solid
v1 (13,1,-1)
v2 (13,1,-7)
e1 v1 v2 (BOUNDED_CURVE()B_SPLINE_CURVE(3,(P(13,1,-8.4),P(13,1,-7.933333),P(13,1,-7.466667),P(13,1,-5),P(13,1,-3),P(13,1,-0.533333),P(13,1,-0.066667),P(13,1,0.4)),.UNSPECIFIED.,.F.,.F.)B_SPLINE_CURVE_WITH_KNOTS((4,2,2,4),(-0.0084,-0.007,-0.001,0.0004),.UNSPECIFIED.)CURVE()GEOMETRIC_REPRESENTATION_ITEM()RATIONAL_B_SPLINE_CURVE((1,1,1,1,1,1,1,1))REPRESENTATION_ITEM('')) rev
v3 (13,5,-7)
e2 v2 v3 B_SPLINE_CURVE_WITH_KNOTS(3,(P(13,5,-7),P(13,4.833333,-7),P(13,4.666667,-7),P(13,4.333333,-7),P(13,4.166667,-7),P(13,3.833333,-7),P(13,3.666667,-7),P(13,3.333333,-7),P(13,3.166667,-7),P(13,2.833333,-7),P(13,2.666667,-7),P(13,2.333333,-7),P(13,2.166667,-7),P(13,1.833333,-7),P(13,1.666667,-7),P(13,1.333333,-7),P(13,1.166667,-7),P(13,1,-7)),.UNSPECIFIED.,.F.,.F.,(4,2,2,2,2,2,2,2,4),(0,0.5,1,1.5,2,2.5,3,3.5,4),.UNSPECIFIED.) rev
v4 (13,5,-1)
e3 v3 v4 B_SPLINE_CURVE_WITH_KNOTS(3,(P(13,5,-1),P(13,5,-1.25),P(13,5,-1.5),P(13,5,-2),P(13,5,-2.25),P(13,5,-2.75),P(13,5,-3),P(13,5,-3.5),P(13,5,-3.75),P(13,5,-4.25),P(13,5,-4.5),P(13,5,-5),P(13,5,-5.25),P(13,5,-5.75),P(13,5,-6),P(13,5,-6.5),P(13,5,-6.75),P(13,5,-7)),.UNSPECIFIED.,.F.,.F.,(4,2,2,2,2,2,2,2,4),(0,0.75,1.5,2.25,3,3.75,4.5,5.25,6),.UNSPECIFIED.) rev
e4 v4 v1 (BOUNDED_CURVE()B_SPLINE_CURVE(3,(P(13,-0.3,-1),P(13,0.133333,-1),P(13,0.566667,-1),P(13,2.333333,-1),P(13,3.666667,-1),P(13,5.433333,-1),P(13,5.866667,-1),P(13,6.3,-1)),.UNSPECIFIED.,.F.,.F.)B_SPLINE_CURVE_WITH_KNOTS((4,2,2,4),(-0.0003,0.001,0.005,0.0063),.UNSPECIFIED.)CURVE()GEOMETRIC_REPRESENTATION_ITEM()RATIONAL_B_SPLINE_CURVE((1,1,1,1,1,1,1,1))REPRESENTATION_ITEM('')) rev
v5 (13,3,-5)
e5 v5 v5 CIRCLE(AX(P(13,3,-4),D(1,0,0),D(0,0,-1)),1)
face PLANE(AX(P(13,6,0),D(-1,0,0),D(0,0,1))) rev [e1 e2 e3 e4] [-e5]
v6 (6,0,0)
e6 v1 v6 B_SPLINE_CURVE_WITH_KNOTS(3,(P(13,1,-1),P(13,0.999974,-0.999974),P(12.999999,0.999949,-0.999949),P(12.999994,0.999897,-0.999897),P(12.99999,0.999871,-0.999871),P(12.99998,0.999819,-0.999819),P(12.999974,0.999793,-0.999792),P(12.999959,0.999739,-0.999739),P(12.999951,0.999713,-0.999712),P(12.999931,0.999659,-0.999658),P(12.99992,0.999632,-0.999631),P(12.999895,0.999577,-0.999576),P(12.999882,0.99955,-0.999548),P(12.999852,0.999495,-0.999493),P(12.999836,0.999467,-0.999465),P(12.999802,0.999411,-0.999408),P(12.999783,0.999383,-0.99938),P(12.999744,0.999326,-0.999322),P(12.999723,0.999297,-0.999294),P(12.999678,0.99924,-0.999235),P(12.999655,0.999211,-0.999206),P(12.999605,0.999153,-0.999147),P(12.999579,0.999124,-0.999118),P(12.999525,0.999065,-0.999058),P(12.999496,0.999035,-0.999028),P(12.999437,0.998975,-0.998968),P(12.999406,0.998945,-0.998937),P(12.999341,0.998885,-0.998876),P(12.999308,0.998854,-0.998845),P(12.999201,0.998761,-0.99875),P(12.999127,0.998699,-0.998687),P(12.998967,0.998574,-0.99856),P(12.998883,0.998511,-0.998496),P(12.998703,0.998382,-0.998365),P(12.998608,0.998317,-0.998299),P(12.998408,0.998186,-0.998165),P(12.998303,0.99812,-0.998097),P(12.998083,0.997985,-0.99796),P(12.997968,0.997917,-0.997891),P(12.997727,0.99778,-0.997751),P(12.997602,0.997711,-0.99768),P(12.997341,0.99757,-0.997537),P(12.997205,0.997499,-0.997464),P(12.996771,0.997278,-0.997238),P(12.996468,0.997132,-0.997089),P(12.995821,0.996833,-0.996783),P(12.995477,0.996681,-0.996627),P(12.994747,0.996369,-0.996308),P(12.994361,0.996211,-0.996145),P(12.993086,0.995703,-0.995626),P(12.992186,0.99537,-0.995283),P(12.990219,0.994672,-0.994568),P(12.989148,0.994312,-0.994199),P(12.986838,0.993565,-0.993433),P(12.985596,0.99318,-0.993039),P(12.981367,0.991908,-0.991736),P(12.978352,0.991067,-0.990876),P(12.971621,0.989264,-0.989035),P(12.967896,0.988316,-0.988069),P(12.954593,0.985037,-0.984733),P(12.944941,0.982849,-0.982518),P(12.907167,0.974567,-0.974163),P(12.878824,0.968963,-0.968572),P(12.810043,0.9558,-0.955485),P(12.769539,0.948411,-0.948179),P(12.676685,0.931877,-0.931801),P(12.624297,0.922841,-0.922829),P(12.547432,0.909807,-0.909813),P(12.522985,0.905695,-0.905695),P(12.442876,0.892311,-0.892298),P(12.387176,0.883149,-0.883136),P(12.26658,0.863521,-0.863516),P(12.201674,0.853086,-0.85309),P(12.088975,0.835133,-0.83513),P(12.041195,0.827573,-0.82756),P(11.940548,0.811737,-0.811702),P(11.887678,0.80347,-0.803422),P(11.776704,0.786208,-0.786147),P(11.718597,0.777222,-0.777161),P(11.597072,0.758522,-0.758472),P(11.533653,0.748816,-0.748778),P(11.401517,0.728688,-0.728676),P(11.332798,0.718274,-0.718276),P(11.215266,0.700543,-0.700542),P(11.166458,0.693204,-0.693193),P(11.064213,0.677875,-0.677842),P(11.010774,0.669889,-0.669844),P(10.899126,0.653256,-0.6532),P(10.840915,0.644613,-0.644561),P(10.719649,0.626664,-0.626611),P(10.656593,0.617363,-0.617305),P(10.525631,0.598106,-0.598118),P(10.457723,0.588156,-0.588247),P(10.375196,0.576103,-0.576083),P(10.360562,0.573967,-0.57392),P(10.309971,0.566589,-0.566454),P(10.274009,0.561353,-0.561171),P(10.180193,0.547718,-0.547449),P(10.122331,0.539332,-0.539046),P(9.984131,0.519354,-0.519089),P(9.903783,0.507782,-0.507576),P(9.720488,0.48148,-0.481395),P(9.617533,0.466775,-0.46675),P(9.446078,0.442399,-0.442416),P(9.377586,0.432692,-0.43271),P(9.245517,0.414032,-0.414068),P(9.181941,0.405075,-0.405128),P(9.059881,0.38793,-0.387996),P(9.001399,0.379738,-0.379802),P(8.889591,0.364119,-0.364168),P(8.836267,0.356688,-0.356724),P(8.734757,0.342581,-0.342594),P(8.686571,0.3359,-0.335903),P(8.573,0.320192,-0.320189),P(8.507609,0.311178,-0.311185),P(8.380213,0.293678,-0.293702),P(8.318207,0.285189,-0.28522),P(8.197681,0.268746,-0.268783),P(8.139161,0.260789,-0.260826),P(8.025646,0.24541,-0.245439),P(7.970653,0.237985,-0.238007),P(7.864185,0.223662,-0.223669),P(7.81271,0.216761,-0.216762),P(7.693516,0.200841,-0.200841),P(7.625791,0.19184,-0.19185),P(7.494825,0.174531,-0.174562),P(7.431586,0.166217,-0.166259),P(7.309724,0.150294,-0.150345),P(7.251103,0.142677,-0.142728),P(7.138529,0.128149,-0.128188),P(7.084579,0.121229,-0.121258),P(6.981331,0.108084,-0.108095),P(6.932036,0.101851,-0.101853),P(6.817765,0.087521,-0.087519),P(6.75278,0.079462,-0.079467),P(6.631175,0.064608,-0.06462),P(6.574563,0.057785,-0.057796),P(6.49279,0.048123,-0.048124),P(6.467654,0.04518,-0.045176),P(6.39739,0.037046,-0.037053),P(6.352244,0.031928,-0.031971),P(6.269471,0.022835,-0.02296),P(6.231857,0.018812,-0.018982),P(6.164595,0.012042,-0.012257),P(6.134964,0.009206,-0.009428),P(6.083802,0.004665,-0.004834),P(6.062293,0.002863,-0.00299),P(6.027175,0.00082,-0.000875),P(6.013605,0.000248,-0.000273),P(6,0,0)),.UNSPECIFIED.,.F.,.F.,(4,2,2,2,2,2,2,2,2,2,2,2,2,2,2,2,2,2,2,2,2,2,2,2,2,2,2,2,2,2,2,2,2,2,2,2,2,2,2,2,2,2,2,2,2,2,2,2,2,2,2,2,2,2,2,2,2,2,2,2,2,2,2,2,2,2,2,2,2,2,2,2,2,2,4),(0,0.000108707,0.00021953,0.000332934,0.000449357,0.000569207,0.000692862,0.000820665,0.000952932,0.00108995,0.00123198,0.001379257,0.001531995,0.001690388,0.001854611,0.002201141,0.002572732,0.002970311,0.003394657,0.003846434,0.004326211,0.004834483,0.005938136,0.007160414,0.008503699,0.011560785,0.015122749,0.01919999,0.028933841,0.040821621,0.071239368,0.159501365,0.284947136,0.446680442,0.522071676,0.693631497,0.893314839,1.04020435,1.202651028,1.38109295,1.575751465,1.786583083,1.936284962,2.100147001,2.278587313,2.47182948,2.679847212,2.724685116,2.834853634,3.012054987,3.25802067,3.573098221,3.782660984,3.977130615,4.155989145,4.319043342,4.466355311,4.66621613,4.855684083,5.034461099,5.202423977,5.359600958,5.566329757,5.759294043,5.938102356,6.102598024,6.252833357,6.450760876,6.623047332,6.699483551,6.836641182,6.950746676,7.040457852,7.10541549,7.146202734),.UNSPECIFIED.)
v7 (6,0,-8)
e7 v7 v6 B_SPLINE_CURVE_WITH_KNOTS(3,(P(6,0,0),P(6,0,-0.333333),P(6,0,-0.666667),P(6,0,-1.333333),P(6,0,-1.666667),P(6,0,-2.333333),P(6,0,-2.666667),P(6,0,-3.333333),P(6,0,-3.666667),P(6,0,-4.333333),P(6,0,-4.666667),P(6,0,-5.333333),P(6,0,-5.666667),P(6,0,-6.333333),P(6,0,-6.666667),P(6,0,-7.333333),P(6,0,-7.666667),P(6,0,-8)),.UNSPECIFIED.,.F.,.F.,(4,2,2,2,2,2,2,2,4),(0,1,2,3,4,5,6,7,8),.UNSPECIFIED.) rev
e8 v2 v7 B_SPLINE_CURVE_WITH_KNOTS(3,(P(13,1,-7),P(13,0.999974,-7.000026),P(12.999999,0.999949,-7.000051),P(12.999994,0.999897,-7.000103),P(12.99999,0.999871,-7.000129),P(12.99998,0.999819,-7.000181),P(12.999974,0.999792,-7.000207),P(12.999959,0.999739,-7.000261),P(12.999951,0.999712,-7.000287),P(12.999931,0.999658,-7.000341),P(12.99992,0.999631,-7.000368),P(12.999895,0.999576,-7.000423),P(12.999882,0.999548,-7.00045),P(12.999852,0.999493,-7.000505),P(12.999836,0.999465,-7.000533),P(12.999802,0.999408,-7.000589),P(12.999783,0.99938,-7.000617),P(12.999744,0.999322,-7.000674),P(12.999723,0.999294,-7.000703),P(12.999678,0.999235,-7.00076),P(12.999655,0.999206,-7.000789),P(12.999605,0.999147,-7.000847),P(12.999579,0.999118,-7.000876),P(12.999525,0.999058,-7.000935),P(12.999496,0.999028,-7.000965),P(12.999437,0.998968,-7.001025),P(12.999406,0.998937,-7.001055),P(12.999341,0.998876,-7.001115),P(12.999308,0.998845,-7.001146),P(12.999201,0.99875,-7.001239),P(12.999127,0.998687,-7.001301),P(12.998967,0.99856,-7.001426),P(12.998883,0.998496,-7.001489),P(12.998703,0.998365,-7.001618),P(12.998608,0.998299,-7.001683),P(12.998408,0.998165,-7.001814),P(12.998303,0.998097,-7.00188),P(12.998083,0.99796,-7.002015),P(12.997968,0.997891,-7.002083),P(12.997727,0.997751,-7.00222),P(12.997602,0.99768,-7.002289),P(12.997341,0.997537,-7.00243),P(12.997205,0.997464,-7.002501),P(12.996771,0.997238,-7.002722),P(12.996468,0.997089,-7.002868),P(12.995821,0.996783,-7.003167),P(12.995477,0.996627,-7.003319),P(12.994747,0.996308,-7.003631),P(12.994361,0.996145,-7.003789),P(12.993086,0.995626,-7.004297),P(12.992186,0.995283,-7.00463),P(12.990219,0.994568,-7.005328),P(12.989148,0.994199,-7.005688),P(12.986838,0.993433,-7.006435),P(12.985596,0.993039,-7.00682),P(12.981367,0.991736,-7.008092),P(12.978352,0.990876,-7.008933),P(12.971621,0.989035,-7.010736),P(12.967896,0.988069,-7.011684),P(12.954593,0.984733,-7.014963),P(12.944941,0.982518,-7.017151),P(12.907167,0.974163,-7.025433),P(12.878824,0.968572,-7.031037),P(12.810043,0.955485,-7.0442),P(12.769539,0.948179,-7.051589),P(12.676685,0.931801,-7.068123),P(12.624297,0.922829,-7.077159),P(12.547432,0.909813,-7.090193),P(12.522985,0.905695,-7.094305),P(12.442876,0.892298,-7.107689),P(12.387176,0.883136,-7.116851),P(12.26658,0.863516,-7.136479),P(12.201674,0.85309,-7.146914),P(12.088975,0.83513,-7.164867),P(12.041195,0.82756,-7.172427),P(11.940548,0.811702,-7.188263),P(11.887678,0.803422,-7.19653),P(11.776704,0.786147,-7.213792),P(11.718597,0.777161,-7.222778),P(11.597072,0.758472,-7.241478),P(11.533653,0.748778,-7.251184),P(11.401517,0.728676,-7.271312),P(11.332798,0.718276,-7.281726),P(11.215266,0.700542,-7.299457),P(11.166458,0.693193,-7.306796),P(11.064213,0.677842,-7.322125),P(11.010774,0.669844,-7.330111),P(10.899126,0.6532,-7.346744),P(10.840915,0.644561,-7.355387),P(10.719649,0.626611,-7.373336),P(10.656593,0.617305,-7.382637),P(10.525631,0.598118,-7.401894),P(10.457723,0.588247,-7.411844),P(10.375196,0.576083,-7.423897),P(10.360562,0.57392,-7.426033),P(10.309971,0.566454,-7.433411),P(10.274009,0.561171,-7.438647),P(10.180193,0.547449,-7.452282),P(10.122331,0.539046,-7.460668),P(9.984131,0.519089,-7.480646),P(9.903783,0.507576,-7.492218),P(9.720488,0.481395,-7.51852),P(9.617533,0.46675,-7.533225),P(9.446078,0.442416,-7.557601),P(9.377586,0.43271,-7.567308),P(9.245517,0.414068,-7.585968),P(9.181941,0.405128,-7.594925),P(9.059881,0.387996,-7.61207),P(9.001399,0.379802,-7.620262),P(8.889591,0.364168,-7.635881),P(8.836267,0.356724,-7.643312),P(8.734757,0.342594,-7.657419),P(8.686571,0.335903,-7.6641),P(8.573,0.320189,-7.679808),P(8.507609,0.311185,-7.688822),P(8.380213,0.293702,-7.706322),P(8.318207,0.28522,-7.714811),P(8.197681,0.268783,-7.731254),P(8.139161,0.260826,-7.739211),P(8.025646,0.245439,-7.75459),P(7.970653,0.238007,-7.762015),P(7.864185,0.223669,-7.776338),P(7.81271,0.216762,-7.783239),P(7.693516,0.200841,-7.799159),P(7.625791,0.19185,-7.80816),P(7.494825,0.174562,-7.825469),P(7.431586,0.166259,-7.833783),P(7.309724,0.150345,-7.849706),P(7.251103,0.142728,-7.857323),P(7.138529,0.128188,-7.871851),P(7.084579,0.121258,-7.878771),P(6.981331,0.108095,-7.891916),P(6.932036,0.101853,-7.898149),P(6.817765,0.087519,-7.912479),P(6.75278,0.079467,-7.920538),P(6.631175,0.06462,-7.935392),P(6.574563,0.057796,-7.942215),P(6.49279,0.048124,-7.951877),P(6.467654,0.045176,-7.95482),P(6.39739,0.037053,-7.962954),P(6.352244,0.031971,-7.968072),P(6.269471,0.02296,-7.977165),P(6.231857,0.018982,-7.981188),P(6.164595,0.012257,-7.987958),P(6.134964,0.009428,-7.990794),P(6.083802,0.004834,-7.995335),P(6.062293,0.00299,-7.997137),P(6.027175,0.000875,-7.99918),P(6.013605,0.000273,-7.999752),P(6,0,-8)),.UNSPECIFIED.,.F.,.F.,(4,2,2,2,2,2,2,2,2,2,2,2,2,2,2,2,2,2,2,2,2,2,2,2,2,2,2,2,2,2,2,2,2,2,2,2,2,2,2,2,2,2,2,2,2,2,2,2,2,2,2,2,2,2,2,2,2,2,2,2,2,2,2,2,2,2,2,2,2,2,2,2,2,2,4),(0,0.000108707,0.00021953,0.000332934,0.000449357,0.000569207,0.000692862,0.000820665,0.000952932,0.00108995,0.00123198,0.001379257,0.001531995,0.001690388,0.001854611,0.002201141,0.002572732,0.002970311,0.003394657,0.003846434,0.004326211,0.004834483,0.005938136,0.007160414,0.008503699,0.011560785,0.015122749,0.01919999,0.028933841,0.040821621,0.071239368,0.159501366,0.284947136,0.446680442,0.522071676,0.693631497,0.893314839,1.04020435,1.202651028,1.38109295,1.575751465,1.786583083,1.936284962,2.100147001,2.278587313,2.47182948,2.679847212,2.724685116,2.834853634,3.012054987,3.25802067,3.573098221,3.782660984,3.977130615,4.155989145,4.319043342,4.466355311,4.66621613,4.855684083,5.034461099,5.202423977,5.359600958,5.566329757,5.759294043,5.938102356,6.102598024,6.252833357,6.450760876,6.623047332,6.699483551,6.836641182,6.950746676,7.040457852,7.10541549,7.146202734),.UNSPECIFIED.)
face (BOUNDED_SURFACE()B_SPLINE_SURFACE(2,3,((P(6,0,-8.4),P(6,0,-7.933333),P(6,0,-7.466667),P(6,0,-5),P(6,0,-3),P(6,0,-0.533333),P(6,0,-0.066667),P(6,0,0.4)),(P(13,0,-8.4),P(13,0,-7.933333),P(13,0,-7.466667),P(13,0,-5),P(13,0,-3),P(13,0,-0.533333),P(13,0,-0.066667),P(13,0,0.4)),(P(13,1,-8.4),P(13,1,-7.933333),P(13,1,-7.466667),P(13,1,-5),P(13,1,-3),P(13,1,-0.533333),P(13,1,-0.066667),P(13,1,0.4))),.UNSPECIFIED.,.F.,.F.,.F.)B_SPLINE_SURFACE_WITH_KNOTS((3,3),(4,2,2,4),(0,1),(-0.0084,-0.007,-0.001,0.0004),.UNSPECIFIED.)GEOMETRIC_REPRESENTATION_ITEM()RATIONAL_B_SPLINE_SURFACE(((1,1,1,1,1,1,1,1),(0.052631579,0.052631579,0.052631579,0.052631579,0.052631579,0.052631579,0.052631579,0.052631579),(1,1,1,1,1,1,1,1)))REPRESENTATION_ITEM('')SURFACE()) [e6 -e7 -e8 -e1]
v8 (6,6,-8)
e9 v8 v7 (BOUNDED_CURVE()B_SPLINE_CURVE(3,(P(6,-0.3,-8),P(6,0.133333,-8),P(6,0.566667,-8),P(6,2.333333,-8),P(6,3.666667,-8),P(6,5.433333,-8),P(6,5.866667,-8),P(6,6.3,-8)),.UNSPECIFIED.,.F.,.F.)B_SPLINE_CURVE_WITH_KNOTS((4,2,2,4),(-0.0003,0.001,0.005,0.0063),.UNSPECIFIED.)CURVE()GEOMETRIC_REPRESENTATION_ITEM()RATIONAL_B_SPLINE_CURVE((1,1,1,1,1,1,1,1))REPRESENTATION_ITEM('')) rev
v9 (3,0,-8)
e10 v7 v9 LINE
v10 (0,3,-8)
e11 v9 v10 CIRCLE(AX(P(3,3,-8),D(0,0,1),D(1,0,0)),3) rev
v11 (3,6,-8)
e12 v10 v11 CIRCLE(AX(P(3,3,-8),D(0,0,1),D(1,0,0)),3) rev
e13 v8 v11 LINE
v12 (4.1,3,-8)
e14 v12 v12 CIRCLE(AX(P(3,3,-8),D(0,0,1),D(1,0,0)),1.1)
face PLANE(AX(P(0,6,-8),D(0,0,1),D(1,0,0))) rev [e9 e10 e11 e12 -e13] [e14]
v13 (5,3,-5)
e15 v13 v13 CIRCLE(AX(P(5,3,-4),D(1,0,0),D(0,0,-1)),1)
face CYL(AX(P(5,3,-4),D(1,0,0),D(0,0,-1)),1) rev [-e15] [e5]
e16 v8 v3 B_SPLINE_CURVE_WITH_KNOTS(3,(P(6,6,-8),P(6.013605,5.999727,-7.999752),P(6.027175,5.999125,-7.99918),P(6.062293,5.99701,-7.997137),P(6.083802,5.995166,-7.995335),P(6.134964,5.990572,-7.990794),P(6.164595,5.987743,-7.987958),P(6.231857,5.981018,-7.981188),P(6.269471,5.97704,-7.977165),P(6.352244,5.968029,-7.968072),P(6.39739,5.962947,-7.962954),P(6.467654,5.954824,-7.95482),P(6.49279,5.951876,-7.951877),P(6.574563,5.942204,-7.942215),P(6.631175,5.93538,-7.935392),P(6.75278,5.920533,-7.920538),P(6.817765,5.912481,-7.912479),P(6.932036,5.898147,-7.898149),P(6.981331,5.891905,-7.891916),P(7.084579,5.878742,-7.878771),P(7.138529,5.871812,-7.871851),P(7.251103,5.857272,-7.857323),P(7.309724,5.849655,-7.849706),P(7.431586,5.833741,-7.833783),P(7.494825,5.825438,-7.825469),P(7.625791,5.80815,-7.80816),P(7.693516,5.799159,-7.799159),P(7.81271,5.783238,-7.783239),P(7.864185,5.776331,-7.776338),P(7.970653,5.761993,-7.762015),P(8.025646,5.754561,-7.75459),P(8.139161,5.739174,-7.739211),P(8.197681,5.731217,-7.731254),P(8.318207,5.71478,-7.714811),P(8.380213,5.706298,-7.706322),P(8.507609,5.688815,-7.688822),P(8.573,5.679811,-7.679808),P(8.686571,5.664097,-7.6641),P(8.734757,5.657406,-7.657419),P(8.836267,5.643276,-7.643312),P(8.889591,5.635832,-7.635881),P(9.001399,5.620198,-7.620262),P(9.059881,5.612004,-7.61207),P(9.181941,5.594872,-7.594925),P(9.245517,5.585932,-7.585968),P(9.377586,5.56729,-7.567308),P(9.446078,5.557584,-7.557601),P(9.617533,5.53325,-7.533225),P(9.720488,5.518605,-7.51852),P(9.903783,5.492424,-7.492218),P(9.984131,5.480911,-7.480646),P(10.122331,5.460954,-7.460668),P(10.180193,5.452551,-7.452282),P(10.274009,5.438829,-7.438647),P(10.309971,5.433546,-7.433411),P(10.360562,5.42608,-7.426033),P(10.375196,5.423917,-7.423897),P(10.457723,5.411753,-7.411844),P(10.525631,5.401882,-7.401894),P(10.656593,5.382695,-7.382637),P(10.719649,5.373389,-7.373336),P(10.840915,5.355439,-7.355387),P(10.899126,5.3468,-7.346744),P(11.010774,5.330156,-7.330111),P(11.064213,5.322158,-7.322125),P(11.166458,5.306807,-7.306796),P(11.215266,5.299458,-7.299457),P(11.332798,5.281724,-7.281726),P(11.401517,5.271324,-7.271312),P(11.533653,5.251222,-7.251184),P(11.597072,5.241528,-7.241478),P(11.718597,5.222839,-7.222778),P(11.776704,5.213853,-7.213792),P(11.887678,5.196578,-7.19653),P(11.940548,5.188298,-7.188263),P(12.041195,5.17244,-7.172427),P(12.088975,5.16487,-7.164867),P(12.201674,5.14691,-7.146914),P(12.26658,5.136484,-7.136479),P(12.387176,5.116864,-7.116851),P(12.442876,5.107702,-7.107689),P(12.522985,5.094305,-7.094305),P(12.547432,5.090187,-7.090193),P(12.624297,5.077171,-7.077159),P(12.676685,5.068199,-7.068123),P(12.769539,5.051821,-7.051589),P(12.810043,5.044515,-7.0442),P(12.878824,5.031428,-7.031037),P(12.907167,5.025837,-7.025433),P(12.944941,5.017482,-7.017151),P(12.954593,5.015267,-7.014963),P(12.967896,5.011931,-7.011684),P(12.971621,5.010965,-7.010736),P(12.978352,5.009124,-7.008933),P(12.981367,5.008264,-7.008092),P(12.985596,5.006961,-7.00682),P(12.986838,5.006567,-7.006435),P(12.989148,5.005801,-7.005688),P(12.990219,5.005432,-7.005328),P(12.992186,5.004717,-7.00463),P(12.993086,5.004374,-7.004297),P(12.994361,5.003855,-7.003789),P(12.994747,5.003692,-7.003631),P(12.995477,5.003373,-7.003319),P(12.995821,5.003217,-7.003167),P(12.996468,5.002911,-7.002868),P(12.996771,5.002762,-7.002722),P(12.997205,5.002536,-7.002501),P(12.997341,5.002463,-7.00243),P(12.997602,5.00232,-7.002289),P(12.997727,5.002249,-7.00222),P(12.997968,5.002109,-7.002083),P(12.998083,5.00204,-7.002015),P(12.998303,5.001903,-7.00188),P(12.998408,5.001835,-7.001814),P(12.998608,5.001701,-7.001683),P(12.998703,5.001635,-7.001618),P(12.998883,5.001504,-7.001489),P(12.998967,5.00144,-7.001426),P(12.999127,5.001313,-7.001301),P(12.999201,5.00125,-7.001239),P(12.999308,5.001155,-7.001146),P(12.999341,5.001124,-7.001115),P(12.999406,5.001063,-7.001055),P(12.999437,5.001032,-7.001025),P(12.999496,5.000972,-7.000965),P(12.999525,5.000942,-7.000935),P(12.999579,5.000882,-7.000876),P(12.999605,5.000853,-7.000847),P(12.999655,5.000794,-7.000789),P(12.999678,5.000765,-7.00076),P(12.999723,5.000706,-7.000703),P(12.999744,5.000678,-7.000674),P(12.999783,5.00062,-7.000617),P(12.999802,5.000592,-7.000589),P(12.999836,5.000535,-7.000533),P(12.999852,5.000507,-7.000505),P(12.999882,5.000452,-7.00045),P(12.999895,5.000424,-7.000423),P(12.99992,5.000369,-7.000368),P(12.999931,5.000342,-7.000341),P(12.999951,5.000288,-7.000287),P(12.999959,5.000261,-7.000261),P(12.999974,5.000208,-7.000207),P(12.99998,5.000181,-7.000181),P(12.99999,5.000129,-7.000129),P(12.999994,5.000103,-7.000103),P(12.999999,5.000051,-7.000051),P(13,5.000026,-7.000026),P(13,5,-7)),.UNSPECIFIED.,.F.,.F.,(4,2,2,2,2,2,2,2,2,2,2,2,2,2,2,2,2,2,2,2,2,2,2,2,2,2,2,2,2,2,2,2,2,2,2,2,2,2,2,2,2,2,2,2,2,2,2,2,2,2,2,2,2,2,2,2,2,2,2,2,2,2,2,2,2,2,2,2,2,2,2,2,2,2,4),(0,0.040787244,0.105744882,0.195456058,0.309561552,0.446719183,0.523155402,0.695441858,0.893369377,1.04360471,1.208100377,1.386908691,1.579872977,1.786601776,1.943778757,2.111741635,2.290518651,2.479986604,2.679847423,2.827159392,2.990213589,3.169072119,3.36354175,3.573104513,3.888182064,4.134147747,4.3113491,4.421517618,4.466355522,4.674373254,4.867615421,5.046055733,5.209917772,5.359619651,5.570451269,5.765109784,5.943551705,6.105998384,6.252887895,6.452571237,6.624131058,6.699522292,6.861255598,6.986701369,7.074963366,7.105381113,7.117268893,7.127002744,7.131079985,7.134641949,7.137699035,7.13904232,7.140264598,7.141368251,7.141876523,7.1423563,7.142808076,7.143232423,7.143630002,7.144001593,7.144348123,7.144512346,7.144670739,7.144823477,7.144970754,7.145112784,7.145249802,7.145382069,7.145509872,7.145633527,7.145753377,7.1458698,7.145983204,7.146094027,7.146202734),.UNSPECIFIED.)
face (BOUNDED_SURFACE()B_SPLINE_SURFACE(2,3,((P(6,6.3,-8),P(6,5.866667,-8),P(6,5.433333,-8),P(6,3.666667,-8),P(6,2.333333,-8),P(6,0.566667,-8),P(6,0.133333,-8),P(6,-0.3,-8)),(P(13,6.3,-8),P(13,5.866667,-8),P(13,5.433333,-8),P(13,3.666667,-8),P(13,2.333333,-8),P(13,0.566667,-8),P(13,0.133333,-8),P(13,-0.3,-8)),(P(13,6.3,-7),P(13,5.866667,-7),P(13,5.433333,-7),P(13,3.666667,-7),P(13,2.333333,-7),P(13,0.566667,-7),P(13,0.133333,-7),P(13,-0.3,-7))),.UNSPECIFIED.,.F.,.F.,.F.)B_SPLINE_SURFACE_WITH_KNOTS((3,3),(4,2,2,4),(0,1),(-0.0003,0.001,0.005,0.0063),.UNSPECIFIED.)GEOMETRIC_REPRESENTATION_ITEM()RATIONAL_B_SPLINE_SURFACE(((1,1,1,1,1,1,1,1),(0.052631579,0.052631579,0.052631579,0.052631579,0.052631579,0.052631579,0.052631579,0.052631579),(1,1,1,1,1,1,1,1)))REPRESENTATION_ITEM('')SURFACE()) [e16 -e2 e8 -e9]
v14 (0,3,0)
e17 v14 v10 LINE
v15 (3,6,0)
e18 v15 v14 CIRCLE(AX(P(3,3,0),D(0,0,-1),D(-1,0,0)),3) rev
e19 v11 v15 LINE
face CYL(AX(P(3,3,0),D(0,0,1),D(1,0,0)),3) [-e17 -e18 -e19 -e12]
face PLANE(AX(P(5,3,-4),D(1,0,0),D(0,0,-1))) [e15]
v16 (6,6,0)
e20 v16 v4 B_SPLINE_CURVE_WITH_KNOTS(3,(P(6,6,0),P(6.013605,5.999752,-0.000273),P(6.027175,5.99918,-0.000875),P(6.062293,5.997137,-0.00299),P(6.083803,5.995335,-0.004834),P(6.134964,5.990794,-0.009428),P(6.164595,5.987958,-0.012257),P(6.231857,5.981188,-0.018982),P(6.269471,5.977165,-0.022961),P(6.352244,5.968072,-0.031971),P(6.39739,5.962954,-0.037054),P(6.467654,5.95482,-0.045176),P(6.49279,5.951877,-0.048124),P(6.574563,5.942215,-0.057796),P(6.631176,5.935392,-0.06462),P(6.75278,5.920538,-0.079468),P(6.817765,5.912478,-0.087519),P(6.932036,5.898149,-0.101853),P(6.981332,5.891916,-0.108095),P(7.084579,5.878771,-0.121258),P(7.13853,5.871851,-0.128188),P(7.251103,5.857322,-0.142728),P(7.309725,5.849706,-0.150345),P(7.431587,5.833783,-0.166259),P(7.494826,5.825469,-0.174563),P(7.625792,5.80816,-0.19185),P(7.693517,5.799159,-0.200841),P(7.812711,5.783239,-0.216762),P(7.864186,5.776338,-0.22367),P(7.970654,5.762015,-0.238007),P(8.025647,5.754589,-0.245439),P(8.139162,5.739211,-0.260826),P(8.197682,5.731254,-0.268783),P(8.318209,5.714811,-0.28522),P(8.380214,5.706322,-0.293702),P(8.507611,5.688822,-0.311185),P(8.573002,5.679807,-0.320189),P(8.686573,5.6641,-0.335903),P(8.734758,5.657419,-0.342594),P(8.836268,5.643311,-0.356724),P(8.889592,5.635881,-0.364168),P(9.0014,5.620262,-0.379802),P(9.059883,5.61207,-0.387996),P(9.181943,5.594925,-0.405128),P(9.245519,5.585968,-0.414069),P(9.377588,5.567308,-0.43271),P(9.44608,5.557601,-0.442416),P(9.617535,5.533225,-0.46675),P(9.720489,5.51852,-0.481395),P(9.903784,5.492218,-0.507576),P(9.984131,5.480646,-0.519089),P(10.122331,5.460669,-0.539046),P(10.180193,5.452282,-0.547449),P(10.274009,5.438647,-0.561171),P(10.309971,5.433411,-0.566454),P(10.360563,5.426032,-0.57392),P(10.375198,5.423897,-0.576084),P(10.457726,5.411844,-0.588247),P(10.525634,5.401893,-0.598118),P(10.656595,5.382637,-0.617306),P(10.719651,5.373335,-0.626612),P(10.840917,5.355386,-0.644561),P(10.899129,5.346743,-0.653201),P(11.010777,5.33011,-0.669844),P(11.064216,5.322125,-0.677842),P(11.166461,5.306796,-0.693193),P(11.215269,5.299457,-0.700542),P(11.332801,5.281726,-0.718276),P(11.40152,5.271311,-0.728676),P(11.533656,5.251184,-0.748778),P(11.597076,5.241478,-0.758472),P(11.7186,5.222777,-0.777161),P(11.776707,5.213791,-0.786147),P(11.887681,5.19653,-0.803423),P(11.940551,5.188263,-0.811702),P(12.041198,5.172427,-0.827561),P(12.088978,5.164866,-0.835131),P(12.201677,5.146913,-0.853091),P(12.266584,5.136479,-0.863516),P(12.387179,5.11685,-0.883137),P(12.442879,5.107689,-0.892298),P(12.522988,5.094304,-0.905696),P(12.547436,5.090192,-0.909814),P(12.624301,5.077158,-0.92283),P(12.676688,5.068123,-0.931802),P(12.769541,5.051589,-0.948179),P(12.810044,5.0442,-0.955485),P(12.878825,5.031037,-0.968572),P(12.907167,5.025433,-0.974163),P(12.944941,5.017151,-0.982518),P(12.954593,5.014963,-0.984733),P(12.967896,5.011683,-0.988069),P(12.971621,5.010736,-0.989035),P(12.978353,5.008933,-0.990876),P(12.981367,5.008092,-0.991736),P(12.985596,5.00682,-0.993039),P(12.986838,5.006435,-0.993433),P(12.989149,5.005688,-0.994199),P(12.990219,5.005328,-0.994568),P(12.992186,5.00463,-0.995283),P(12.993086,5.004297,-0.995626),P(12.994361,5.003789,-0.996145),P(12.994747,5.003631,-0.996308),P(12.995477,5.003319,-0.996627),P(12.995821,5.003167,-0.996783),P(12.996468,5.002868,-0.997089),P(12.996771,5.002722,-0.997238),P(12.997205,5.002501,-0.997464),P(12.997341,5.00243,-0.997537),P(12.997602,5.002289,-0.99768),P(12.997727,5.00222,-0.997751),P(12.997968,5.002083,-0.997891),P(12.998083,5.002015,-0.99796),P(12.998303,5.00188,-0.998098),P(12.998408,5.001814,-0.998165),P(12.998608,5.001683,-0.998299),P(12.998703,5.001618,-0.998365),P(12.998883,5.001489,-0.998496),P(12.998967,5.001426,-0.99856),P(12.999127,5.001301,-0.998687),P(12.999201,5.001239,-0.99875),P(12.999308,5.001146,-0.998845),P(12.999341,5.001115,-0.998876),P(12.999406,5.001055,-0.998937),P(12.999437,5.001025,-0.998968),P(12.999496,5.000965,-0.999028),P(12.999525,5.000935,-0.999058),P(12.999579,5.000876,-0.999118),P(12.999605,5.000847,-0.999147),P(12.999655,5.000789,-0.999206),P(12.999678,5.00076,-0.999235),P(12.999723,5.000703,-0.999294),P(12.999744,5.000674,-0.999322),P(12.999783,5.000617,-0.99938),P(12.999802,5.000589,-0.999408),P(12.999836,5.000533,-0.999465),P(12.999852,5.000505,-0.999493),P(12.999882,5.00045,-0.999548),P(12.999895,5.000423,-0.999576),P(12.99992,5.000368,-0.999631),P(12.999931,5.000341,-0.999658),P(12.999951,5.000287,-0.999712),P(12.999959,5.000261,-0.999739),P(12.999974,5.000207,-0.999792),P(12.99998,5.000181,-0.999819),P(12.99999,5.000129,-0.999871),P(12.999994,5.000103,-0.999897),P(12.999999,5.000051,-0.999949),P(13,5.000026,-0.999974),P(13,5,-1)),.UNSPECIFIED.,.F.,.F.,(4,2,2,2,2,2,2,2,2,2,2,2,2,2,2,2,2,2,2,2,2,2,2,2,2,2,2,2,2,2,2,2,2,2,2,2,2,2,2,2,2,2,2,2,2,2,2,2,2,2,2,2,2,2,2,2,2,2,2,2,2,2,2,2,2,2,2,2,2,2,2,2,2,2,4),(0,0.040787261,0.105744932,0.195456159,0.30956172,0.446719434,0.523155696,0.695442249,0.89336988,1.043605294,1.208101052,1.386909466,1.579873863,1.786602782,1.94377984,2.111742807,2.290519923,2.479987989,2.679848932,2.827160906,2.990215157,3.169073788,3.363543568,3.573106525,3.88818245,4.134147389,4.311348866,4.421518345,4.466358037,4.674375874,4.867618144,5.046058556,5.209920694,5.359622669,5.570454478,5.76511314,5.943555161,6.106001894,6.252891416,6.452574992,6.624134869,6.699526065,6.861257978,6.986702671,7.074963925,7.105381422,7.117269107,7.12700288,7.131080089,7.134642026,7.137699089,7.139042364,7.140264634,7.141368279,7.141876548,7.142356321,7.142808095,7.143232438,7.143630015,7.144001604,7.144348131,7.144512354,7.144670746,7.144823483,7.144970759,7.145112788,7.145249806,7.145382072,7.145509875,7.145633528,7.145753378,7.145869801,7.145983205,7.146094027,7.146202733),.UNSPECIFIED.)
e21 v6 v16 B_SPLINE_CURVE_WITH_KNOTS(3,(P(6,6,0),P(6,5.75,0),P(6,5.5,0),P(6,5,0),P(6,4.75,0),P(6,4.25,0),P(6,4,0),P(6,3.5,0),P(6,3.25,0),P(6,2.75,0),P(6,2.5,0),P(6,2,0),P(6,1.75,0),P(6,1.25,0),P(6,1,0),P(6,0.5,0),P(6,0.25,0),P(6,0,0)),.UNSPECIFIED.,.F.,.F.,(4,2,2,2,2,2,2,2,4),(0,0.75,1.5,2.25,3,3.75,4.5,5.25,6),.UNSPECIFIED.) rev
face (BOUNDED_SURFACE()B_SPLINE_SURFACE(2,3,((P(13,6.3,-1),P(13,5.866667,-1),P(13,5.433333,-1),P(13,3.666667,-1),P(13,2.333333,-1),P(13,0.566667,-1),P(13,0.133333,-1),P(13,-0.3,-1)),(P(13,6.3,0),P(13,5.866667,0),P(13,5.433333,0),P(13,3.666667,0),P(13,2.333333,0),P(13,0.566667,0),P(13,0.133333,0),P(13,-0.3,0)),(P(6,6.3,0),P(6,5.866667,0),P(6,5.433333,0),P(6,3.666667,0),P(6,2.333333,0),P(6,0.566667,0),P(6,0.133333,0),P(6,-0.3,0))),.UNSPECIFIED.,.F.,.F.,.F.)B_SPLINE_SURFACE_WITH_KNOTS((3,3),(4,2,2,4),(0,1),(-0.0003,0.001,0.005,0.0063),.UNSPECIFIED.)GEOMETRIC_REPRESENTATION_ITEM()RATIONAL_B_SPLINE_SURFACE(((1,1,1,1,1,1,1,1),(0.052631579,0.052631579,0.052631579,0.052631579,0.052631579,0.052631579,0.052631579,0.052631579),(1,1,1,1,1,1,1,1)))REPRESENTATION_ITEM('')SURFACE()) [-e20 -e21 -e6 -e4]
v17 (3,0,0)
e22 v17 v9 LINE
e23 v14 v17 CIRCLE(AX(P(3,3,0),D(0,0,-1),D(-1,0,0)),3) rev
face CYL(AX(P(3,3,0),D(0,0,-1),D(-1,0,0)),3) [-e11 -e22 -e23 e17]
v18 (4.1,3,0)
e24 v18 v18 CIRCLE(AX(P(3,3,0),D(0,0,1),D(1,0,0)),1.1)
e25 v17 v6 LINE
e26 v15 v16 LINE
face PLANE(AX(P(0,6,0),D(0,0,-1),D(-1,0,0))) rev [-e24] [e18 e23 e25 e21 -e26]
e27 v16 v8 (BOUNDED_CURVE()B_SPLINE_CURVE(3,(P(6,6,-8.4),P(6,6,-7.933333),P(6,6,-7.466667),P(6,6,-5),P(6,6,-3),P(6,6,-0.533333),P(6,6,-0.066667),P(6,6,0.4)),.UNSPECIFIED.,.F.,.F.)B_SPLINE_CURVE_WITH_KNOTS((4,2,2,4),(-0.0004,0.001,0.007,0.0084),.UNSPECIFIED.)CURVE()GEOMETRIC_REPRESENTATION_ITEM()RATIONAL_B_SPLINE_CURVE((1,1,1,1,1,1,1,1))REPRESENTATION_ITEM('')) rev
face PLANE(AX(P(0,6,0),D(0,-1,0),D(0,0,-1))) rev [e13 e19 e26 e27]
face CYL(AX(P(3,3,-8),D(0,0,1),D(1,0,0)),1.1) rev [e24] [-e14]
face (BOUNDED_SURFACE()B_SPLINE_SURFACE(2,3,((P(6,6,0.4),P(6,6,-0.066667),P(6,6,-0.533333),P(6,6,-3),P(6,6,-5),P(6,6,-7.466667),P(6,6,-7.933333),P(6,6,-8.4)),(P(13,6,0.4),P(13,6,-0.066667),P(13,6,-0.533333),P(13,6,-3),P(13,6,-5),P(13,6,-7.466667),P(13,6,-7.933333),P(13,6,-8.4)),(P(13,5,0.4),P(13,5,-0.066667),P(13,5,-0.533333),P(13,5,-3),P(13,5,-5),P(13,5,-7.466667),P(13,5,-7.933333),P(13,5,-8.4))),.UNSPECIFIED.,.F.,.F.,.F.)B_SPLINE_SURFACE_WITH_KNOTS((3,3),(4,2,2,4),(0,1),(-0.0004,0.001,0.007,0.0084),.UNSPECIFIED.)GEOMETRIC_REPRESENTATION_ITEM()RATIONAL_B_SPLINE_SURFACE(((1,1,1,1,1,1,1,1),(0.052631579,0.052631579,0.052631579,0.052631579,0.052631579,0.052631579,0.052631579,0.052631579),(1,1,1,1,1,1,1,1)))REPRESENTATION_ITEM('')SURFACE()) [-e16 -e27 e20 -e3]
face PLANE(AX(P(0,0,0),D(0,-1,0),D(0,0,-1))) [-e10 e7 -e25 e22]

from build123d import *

# Parameters (mm, degrees)
SKETCH_1_W          = 13
SKETCH_1_H          = 8
EXTRUDE_1_DEPTH     = 6
SKETCH_2_R          = 1.1
CUT_EXTRUDE_1_DEPTH = 17.401219467
SKETCH_3_R          = 1
CUT_EXTRUDE_2_DEPTH = 8
FILLET_1_SIZE       = 1
FILLET_1_SIZE_2     = 7
FILLET_2_R          = 3


# Some blends are built 0.0001 mm under size
with BuildPart() as part:
    # 草图1 → 凸台-拉伸1 (new body)
    with BuildSketch(Plane(origin=(0, 0, 0), x_dir=(1, 0, 0), z_dir=(0, 1, 0))):
        with Locations((6.5, 4)):
            Rectangle(SKETCH_1_W, SKETCH_1_H)
    extrude(amount=EXTRUDE_1_DEPTH)

    # 草图2 → 切除-拉伸1 (cut, through all)
    with BuildSketch(Plane.XY):
        with Locations((3, 3)):
            Circle(SKETCH_2_R)
    extrude(amount=-CUT_EXTRUDE_1_DEPTH, mode=Mode.SUBTRACT)

    # 草图3 → 切除-拉伸2 (cut)
    with BuildSketch(Plane(origin=(13, 0, 0), x_dir=(0, 0, -1), z_dir=(1, 0, 0))):
        with Locations((4, 3)):
            Circle(SKETCH_3_R)
    extrude(amount=-CUT_EXTRUDE_2_DEPTH, mode=Mode.SUBTRACT)

    # 圆角1
    # a fillet whose section is not a circle: 7, 1 mm, written as the material it takes off along each edge
    with BuildSketch(Plane(origin=(13, -17.5, -8), x_dir=(0, 0, 1), z_dir=(0, 1, 0))) as fillet_1_piece_1:
        with BuildLine():
            Bezier((FILLET_1_SIZE, 0), (0, 0), (0, -FILLET_1_SIZE_2), weights=[1, 0.052631579, 1])
            Line((0, -FILLET_1_SIZE_2), (0, 0))
            Line((0, 0), (FILLET_1_SIZE, 0))
        make_face()
    extrude(amount=41, mode=Mode.SUBTRACT)
    with BuildSketch(Plane(origin=(13, 0, 17.5), x_dir=(-1, 0, 0), z_dir=(0, 0, -1))) as fillet_1_piece_2:
        with BuildLine():
            Bezier((FILLET_1_SIZE_2, 0), (0, 0), (0, FILLET_1_SIZE), weights=[1, 0.052631579, 1])
            Line((0, FILLET_1_SIZE), (0, 0))
            Line((0, 0), (FILLET_1_SIZE_2, 0))
        make_face()
    extrude(amount=43, mode=Mode.SUBTRACT)
    with BuildSketch(Plane(origin=(13, -17.5, 0), x_dir=(-1, 0, 0), z_dir=(0, 1, 0))) as fillet_1_piece_3:
        with BuildLine():
            Bezier((FILLET_1_SIZE_2, 0), (0, 0), (0, -FILLET_1_SIZE), weights=[1, 0.052631579, 1])
            Line((0, -FILLET_1_SIZE), (0, 0))
            Line((0, 0), (FILLET_1_SIZE_2, 0))
        make_face()
    extrude(amount=41, mode=Mode.SUBTRACT)
    with BuildSketch(Plane(origin=(13, 6, 17.5), x_dir=(-1, 0, 0), z_dir=(0, 0, -1))) as fillet_1_piece_4:
        with BuildLine():
            Bezier((FILLET_1_SIZE_2, 0), (0, 0), (0, -FILLET_1_SIZE), weights=[1, 0.052631579, 1])
            Line((0, -FILLET_1_SIZE), (0, 0))
            Line((0, 0), (FILLET_1_SIZE_2, 0))
        make_face()
    extrude(amount=43, mode=Mode.SUBTRACT)

    # 圆角2
    fillet_2_edges = [part.edges().sort_by_distance(p)[0] for p in [
        (0, 0, -4),
        (0, 6, -4),
    ]]
    fillet(fillet_2_edges, radius=FILLET_2_R - 0.0001)  # a hair under: the kernel refuses the full size


solid = part.part
